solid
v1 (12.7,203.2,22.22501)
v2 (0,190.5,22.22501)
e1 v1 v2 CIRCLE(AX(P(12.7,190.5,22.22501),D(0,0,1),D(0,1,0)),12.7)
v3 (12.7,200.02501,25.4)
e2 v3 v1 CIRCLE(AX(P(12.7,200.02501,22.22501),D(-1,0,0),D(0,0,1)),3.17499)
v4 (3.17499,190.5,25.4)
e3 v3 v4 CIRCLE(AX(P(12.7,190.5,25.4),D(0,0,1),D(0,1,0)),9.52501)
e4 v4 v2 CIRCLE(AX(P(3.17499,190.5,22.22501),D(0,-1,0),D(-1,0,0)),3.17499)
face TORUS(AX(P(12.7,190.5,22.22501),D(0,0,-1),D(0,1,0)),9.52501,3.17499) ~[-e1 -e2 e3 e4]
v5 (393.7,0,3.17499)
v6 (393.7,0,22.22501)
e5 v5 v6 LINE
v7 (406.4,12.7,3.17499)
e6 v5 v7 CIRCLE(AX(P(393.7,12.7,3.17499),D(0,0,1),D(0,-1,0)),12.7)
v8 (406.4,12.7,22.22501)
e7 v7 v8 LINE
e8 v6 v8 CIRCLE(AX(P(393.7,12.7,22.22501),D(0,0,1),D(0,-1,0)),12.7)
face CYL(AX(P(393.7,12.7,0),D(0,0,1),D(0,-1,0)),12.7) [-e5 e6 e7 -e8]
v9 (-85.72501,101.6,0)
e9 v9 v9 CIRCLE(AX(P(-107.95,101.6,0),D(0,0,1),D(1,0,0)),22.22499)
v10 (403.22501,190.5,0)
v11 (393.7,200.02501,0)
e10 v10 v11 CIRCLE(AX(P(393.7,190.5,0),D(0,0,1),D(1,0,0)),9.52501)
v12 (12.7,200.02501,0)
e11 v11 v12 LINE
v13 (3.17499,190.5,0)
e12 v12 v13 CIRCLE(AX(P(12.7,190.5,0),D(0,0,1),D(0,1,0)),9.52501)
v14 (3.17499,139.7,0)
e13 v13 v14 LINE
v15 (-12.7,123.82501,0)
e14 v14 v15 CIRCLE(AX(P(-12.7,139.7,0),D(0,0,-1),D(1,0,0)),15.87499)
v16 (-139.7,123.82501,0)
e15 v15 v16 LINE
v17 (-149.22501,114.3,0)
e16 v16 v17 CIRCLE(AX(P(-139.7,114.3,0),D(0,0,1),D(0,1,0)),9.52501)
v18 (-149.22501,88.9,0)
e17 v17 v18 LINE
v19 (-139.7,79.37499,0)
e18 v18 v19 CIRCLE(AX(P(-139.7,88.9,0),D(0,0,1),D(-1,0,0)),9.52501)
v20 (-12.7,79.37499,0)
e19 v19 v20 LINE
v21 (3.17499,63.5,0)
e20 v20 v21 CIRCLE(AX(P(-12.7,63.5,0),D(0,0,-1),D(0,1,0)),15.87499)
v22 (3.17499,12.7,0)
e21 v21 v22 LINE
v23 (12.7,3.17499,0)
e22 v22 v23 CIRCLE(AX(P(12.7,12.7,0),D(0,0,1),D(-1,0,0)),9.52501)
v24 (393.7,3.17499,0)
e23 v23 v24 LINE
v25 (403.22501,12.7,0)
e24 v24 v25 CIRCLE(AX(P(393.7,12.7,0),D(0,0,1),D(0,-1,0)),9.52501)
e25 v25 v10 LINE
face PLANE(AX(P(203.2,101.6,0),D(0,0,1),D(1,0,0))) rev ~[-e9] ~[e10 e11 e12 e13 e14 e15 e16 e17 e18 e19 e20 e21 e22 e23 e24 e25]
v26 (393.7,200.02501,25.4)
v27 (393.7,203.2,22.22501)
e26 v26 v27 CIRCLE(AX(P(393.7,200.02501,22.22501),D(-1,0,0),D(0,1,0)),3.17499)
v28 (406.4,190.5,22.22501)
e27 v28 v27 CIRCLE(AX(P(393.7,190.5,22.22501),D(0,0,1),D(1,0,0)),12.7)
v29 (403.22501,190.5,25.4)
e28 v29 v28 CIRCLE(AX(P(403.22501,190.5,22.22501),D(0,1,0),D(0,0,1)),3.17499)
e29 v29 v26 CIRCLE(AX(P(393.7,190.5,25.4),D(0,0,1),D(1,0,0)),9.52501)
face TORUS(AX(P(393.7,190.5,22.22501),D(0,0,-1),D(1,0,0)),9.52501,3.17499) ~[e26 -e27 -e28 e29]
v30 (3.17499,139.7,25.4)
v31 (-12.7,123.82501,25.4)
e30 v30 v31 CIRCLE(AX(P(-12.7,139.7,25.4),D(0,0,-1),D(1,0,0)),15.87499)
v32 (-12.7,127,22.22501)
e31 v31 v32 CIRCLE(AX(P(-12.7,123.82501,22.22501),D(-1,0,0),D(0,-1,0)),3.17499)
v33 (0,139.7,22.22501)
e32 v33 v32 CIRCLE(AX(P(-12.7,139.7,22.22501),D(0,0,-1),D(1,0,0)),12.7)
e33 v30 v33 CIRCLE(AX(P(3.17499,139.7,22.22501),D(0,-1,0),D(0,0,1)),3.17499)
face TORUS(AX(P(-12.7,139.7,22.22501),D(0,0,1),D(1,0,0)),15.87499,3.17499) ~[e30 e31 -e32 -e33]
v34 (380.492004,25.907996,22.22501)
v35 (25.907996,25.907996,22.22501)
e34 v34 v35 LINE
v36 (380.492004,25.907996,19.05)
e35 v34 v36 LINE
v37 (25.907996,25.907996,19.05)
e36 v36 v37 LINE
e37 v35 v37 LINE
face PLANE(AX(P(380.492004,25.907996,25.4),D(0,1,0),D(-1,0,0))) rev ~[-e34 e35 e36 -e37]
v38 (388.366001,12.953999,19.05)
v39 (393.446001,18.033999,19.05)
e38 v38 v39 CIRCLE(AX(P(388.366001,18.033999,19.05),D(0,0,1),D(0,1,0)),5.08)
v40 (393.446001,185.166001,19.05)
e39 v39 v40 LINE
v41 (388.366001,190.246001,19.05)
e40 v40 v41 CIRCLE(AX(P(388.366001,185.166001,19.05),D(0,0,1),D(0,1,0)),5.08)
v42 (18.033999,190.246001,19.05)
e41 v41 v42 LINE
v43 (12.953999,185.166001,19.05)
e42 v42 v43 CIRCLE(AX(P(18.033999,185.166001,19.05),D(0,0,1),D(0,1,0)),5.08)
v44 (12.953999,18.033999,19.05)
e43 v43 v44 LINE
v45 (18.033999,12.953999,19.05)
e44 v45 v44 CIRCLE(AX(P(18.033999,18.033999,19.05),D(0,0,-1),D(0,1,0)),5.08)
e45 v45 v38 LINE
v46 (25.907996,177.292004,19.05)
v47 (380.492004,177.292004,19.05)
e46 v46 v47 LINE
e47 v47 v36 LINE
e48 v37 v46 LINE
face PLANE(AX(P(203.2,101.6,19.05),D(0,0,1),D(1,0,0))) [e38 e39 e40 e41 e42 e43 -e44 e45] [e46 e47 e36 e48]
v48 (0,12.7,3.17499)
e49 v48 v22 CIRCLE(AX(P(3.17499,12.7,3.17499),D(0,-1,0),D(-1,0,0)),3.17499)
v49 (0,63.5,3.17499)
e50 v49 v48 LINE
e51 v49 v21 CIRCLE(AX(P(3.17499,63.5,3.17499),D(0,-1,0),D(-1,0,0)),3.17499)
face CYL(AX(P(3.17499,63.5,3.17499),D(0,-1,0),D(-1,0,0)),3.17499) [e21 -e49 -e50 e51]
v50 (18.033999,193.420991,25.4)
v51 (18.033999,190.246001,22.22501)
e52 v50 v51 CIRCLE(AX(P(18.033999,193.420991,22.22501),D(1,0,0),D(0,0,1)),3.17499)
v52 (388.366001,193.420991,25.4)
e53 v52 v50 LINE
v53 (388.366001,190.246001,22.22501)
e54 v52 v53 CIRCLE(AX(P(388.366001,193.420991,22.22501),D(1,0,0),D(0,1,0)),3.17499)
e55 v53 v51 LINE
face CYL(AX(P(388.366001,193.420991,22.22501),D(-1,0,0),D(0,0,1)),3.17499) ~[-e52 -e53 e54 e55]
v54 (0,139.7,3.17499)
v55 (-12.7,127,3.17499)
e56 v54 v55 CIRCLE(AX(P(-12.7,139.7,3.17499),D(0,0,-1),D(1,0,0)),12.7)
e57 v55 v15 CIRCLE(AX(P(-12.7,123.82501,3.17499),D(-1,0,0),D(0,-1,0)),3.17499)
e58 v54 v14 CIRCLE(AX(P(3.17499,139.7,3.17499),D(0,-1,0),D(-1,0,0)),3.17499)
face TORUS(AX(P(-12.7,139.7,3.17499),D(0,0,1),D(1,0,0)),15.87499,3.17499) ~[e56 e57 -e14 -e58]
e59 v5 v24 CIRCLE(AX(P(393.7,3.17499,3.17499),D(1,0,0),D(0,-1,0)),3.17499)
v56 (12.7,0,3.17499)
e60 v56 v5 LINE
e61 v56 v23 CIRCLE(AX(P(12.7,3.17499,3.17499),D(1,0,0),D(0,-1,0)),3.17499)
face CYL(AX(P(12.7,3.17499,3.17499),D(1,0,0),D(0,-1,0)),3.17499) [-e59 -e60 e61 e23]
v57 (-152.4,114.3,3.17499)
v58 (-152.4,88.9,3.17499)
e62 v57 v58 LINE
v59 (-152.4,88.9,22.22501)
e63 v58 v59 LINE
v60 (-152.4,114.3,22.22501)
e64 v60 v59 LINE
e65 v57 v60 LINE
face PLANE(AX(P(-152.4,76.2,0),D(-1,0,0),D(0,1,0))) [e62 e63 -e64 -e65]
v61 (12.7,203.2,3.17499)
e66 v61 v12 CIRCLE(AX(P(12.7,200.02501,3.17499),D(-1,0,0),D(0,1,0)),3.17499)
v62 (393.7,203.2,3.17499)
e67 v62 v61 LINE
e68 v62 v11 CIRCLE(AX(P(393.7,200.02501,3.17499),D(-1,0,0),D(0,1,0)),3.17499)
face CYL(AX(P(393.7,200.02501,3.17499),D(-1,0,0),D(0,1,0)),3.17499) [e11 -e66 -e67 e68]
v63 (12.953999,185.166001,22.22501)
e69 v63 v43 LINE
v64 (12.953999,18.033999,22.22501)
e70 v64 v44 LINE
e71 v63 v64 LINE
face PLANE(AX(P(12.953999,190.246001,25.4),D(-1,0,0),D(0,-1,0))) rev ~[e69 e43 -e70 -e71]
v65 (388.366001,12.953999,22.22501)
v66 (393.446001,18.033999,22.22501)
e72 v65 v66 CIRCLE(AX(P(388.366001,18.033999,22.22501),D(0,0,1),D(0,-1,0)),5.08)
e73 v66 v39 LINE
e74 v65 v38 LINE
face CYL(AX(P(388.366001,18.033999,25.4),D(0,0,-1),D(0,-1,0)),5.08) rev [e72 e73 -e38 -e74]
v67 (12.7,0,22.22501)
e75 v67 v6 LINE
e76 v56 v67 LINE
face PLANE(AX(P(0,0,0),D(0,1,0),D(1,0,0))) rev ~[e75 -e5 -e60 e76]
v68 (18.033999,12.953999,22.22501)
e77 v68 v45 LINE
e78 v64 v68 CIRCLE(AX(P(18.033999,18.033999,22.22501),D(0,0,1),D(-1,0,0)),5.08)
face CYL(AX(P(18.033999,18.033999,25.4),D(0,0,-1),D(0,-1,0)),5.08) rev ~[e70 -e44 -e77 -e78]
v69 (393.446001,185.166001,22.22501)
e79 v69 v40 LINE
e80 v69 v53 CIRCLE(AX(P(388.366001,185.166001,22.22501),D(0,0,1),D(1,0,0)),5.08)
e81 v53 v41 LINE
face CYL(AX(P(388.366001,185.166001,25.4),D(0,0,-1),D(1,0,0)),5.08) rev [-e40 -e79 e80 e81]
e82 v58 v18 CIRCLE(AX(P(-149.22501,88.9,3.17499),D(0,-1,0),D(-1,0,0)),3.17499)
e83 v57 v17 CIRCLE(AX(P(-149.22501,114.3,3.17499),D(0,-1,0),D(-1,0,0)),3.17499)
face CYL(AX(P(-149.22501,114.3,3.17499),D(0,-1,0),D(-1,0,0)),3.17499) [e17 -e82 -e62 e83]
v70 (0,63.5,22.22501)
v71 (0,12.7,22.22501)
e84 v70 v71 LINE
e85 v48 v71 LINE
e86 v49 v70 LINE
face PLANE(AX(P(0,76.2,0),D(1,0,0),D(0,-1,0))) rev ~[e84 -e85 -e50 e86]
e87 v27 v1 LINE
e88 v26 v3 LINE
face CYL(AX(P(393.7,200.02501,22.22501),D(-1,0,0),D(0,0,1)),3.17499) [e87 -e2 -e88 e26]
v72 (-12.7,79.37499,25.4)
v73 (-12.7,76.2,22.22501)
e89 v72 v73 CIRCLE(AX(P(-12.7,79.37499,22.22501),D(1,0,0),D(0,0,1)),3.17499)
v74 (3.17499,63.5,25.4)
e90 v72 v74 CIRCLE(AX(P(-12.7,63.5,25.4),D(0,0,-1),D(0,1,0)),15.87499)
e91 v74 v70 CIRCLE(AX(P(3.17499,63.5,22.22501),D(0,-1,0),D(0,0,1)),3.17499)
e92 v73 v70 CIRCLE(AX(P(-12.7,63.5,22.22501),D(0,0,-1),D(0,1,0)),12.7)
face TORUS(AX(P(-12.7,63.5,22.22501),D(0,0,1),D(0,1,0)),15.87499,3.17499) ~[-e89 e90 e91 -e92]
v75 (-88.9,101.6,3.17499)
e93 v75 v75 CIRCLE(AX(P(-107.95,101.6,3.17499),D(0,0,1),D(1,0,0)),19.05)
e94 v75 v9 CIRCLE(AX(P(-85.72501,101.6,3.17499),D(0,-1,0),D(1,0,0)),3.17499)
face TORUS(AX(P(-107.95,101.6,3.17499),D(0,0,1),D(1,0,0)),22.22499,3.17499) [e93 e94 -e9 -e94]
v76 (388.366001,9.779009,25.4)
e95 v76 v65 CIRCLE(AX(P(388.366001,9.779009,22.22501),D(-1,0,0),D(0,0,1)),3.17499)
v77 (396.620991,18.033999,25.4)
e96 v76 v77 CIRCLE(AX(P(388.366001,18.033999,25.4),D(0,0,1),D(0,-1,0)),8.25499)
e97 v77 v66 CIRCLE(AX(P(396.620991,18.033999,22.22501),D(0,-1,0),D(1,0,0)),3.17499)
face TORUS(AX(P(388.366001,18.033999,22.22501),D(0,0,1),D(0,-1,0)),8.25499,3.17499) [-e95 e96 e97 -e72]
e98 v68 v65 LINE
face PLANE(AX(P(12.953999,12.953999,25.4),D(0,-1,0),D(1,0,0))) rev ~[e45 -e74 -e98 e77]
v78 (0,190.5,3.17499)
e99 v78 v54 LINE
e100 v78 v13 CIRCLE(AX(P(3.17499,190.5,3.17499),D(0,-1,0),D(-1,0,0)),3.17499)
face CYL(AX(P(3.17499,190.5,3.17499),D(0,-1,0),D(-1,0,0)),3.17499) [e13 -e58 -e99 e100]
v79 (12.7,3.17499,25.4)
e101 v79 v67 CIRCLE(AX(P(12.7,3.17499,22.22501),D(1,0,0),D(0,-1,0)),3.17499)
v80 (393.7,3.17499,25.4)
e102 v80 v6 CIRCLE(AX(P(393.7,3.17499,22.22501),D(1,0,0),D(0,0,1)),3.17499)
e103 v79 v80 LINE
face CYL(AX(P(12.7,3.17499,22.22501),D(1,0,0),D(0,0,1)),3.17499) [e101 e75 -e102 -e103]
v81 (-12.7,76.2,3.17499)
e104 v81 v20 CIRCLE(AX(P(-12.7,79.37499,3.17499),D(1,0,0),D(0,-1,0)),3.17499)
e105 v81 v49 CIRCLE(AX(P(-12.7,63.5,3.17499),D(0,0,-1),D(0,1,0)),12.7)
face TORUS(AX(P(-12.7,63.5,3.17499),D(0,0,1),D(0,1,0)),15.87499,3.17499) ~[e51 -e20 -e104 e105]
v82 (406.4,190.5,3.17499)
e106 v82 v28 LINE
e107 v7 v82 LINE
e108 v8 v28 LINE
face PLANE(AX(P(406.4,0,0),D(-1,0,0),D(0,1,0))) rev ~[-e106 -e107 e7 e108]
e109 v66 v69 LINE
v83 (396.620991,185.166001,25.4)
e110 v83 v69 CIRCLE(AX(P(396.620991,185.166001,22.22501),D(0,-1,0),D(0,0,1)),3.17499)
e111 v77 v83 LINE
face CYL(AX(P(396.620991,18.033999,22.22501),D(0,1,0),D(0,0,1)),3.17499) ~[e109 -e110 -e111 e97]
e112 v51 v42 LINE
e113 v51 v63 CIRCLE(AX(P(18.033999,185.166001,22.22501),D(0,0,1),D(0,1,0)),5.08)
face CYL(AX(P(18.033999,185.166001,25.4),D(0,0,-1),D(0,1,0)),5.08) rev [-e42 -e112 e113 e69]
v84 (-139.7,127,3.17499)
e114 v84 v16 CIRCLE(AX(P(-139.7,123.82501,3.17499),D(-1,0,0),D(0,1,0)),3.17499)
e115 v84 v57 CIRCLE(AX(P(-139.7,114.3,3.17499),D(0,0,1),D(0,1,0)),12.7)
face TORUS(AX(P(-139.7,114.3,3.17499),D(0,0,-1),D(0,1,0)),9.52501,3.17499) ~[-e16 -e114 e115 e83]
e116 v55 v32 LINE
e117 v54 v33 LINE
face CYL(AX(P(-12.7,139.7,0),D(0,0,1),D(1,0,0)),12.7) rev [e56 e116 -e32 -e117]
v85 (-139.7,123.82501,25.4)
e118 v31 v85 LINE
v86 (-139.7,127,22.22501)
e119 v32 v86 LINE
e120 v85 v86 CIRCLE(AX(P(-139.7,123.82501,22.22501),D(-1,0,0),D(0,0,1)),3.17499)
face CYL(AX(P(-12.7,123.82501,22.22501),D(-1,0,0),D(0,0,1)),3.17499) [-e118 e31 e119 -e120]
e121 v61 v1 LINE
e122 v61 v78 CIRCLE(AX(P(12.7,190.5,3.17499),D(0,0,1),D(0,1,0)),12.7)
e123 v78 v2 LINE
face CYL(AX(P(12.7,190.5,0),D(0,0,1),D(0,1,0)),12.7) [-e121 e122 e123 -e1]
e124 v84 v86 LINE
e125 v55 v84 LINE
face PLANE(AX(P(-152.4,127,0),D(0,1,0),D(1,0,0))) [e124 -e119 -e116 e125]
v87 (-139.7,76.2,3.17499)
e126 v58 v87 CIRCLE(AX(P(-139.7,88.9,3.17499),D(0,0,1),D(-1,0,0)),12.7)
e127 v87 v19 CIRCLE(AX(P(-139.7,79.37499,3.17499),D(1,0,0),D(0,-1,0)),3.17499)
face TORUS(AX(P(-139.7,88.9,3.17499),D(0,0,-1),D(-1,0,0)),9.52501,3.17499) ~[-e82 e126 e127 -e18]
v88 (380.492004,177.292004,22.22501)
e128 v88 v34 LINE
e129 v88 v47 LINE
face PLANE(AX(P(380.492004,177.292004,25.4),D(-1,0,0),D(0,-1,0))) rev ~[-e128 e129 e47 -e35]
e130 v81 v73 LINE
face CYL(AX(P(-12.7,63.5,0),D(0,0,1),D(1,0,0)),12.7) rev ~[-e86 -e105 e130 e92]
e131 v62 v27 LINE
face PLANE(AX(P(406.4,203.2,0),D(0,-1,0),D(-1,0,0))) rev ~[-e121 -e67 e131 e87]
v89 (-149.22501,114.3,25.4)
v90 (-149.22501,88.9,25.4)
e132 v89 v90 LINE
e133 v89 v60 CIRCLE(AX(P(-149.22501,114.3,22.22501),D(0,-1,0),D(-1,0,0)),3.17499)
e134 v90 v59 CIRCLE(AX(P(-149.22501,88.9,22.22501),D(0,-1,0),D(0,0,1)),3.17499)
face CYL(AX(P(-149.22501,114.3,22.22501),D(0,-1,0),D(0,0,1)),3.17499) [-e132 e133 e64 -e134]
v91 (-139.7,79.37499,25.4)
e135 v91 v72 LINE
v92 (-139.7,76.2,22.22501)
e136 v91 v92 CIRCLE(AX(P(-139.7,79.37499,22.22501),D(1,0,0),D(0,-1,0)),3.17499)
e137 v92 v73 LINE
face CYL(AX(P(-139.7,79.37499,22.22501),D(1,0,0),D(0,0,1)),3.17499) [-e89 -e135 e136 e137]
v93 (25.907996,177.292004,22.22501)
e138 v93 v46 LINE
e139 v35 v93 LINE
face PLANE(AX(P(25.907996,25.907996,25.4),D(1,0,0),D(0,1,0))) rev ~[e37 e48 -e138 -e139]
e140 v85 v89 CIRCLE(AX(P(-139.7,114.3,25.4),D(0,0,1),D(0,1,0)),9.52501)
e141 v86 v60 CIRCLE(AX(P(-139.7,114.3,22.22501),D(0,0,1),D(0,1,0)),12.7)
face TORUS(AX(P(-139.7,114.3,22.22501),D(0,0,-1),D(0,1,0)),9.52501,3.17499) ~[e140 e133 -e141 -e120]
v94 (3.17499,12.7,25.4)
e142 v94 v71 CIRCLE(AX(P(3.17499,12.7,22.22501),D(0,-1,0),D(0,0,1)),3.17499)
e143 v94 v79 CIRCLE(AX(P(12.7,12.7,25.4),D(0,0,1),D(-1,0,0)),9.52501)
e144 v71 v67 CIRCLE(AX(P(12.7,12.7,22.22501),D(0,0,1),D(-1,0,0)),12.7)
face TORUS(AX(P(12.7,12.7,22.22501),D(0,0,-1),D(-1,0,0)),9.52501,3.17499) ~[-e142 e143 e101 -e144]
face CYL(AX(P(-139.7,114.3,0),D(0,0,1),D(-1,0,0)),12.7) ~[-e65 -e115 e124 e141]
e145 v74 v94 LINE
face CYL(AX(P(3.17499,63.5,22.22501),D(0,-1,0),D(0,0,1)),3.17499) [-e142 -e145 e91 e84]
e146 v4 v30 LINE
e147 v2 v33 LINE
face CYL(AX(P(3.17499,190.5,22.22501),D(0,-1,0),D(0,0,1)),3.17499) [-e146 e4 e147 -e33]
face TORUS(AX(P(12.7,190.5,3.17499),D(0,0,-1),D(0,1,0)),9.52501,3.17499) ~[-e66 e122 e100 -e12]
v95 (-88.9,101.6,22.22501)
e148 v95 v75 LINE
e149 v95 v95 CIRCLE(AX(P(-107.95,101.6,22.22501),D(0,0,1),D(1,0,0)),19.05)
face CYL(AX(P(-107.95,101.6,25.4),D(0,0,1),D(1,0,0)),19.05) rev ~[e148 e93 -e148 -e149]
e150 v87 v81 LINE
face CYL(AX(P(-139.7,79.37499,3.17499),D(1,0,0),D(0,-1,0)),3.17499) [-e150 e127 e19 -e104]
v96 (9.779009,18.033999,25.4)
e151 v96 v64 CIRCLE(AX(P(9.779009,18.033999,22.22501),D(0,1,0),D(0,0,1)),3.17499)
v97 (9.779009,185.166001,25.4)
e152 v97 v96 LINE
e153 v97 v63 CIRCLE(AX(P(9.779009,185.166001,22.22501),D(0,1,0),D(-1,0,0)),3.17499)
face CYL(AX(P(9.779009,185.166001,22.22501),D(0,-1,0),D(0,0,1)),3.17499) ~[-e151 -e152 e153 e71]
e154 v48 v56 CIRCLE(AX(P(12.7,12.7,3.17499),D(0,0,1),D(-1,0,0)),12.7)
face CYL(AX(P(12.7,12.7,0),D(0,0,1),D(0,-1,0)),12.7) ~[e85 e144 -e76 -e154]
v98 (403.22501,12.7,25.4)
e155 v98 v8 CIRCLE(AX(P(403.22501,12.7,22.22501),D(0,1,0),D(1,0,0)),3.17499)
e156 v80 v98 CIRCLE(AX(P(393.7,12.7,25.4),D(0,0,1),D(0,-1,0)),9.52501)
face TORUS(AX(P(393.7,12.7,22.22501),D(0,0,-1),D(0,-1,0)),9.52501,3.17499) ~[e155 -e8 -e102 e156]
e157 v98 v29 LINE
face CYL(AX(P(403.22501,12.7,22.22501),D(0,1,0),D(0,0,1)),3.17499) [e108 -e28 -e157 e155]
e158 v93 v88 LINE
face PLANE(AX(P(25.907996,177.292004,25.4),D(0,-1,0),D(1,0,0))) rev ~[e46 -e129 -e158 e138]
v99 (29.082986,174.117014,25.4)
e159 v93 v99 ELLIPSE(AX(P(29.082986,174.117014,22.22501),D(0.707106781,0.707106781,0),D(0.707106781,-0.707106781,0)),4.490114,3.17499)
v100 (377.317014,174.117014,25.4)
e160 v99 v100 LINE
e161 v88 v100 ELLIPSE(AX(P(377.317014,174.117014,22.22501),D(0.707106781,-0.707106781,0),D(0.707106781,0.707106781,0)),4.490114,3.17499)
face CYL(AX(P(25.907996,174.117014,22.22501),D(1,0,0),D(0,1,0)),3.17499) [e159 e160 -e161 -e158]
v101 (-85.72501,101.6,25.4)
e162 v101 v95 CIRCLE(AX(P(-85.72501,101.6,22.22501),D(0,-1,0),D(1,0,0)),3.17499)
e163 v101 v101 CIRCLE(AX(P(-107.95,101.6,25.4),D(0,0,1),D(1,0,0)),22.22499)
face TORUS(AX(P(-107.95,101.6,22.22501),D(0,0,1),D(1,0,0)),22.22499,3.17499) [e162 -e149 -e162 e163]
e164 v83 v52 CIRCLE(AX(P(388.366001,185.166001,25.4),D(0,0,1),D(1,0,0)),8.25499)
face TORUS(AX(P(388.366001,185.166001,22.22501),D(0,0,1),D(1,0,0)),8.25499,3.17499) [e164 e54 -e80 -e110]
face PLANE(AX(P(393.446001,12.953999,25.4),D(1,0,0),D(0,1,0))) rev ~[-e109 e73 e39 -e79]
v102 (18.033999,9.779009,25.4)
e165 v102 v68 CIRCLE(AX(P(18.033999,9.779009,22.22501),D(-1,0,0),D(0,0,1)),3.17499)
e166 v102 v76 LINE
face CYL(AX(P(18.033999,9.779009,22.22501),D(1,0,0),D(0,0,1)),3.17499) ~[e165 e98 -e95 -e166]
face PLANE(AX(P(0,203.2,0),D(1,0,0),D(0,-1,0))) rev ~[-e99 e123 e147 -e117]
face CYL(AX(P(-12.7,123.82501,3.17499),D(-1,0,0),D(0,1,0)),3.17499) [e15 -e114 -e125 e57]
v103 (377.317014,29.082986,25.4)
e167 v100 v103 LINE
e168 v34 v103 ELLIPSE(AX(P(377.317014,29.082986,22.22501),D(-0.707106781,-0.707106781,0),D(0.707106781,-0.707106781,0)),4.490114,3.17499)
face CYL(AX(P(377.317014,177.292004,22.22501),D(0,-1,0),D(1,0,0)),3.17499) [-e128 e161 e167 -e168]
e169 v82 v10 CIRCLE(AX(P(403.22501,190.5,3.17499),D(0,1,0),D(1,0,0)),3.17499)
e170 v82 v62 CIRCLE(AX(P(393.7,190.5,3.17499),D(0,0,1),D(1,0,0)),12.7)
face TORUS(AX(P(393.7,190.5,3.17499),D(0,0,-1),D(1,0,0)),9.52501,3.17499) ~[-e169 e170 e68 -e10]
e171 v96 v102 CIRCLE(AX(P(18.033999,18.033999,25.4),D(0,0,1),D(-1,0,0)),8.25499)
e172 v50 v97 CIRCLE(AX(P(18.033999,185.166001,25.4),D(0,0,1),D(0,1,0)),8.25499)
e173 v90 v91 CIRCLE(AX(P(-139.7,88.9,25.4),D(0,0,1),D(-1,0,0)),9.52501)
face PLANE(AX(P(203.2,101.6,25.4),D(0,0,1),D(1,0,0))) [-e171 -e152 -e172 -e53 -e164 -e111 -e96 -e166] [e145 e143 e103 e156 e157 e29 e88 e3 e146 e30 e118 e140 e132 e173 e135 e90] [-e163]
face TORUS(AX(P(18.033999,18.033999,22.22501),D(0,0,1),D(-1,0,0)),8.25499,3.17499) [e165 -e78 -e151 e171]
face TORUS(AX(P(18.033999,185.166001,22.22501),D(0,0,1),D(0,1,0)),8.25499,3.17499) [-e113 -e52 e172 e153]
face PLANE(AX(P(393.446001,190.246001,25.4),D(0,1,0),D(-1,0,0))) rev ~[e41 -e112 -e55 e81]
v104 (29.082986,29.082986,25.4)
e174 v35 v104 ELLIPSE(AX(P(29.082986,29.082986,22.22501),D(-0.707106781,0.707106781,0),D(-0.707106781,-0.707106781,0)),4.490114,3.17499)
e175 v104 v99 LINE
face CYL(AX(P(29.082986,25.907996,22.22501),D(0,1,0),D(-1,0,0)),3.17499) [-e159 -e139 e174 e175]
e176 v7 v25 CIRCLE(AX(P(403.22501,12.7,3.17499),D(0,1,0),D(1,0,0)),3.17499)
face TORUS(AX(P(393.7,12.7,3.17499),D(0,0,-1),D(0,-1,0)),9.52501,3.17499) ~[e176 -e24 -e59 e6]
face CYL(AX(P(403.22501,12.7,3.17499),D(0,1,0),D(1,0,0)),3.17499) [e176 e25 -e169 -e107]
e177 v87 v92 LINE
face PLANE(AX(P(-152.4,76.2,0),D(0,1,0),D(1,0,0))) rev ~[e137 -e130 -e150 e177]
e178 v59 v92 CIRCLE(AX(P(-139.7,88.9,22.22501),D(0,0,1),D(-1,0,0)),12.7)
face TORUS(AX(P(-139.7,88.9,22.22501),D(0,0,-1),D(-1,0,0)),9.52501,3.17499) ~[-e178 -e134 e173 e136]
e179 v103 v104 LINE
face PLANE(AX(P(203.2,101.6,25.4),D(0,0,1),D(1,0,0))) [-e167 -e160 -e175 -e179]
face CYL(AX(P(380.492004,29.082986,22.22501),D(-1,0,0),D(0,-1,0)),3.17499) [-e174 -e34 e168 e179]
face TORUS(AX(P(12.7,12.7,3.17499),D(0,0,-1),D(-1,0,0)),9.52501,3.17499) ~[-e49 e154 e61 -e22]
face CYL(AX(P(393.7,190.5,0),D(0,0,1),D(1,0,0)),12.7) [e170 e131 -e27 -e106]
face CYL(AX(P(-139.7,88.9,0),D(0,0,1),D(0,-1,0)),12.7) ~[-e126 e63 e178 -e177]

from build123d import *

# Parameters (mm, degrees)
F0_W     = 152.4
F0_H     = 50.8
F1_DEPTH = 25.4
F2_R     = 19.05
F3_DEPTH = 25.4
F5_DEPTH = 6.35
F6_R     = 12.7
F7_R     = 5.08
F8_R     = 3.17499


# Not quite as in the source:
# - a fillet or chamfer is up to 0.001 mm smaller than in the source, because OpenCascade refuses the exact size


with BuildPart() as f1:
    # F0 (on Top) → F1 (new body)
    with BuildSketch(Plane.XY):
        Polygon((0, 76.2), (0, 0), (406.4, 0), (406.4, 203.2), (0, 203.2), (0, 127), align=None)
        with Locations((-76.2, 101.6)):
            Rectangle(F0_W, F0_H)
    extrude(amount=F1_DEPTH)

    # F2 (on face) → F3 (cut)
    with BuildSketch(Plane.XY.offset(25.4)):
        with Locations((-107.95, 101.6)):
            Circle(F2_R)
    extrude(amount=-F3_DEPTH, mode=Mode.SUBTRACT)

    # F4 (on face) → F5 (cut)
    with BuildSketch(Plane.XY.offset(25.4)):
        Polygon((12.953999114, 76.2), (12.953999114, 12.953999114), (393.446000886, 12.953999114), (393.446000886, 190.246000886), (12.953999114, 190.246000886), (12.953999114, 127), align=None)
        Polygon((25.9079957724, 76.2), (25.9079957724, 127), (25.9079957724, 177.2920042276), (380.4920042276, 177.2920042276), (380.4920042276, 25.9079957724), (25.9079957724, 25.9079957724), align=None, mode=Mode.SUBTRACT)
    extrude(amount=-F5_DEPTH, mode=Mode.SUBTRACT)

    # F6
    f6_edges = [f1.edges().sort_by_distance(p)[0] for p in [
        (-152.4, 76.2, 12.7),
        (-152.4, 127, 12.7),
        (0, 203.2, 12.7),
        (0, 0, 12.7),
        (406.4, 203.2, 12.7),
        (406.4, 0, 12.7),
        (0, 76.2, 12.7),
        (0, 127, 12.7),
    ]]
    fillet(f6_edges, radius=F6_R)

    # F7
    f7_edges = [f1.edges().sort_by_distance(p)[0] for p in [
        (12.953999, 190.246001, 22.225),
        (393.446001, 190.246001, 22.225),
        (393.446001, 12.953999, 22.225),
        (12.953999, 12.953999, 22.225),
    ]]
    fillet(f7_edges, radius=F7_R)

    # F8 (radius 3.175 in the source; OpenCascade refuses exactly that, so slightly less here)
    f8_edges = [f1.edges().sort_by_distance(p)[0] for p in [
        (203.2, 177.292004, 25.4),
        (380.492004, 101.6, 25.4),
        (203.2, 25.907996, 25.4),
        (25.907996, 101.6, 25.4),
        (203.2, 12.953999, 25.4),
        (14.441897, 14.441897, 25.4),
        (391.958103, 14.441897, 25.4),
        (12.953999, 101.6, 25.4),
        (393.446001, 101.6, 25.4),
        (14.441897, 188.758103, 25.4),
        (391.958103, 188.758103, 25.4),
        (203.2, 190.246001, 25.4),
        (0, 38.1, 25.4),
        (-3.719744, 72.480256, 25.4),
        (3.719744, 3.719744, 25.4),
        (-76.2, 76.2, 25.4),
        (203.2, 0, 25.4),
        (-148.680256, 79.919744, 25.4),
        (402.680256, 3.719744, 25.4),
        (-152.4, 101.6, 25.4),
        (406.4, 101.6, 25.4),
        (-148.680256, 123.280256, 25.4),
        (402.680256, 199.480256, 25.4),
        (-76.2, 127, 25.4),
        (203.2, 203.2, 25.4),
        (-3.719744, 130.719744, 25.4),
        (3.719744, 199.480256, 25.4),
        (0, 165.1, 25.4),
        (-127, 101.6, 25.4),
        (0, 38.1, 0),
        (-3.719744, 72.480256, 0),
        (3.719744, 3.719744, 0),
        (-76.2, 76.2, 0),
        (203.2, 0, 0),
        (-148.680256, 79.919744, 0),
        (402.680256, 3.719744, 0),
        (-152.4, 101.6, 0),
        (406.4, 101.6, 0),
        (-148.680256, 123.280256, 0),
        (402.680256, 199.480256, 0),
        (-76.2, 127, 0),
        (203.2, 203.2, 0),
        (-3.719744, 130.719744, 0),
        (3.719744, 199.480256, 0),
        (0, 165.1, 0),
        (-127, 101.6, 0),
    ]]
    fillet(f8_edges, radius=F8_R)


solid = f1.part
